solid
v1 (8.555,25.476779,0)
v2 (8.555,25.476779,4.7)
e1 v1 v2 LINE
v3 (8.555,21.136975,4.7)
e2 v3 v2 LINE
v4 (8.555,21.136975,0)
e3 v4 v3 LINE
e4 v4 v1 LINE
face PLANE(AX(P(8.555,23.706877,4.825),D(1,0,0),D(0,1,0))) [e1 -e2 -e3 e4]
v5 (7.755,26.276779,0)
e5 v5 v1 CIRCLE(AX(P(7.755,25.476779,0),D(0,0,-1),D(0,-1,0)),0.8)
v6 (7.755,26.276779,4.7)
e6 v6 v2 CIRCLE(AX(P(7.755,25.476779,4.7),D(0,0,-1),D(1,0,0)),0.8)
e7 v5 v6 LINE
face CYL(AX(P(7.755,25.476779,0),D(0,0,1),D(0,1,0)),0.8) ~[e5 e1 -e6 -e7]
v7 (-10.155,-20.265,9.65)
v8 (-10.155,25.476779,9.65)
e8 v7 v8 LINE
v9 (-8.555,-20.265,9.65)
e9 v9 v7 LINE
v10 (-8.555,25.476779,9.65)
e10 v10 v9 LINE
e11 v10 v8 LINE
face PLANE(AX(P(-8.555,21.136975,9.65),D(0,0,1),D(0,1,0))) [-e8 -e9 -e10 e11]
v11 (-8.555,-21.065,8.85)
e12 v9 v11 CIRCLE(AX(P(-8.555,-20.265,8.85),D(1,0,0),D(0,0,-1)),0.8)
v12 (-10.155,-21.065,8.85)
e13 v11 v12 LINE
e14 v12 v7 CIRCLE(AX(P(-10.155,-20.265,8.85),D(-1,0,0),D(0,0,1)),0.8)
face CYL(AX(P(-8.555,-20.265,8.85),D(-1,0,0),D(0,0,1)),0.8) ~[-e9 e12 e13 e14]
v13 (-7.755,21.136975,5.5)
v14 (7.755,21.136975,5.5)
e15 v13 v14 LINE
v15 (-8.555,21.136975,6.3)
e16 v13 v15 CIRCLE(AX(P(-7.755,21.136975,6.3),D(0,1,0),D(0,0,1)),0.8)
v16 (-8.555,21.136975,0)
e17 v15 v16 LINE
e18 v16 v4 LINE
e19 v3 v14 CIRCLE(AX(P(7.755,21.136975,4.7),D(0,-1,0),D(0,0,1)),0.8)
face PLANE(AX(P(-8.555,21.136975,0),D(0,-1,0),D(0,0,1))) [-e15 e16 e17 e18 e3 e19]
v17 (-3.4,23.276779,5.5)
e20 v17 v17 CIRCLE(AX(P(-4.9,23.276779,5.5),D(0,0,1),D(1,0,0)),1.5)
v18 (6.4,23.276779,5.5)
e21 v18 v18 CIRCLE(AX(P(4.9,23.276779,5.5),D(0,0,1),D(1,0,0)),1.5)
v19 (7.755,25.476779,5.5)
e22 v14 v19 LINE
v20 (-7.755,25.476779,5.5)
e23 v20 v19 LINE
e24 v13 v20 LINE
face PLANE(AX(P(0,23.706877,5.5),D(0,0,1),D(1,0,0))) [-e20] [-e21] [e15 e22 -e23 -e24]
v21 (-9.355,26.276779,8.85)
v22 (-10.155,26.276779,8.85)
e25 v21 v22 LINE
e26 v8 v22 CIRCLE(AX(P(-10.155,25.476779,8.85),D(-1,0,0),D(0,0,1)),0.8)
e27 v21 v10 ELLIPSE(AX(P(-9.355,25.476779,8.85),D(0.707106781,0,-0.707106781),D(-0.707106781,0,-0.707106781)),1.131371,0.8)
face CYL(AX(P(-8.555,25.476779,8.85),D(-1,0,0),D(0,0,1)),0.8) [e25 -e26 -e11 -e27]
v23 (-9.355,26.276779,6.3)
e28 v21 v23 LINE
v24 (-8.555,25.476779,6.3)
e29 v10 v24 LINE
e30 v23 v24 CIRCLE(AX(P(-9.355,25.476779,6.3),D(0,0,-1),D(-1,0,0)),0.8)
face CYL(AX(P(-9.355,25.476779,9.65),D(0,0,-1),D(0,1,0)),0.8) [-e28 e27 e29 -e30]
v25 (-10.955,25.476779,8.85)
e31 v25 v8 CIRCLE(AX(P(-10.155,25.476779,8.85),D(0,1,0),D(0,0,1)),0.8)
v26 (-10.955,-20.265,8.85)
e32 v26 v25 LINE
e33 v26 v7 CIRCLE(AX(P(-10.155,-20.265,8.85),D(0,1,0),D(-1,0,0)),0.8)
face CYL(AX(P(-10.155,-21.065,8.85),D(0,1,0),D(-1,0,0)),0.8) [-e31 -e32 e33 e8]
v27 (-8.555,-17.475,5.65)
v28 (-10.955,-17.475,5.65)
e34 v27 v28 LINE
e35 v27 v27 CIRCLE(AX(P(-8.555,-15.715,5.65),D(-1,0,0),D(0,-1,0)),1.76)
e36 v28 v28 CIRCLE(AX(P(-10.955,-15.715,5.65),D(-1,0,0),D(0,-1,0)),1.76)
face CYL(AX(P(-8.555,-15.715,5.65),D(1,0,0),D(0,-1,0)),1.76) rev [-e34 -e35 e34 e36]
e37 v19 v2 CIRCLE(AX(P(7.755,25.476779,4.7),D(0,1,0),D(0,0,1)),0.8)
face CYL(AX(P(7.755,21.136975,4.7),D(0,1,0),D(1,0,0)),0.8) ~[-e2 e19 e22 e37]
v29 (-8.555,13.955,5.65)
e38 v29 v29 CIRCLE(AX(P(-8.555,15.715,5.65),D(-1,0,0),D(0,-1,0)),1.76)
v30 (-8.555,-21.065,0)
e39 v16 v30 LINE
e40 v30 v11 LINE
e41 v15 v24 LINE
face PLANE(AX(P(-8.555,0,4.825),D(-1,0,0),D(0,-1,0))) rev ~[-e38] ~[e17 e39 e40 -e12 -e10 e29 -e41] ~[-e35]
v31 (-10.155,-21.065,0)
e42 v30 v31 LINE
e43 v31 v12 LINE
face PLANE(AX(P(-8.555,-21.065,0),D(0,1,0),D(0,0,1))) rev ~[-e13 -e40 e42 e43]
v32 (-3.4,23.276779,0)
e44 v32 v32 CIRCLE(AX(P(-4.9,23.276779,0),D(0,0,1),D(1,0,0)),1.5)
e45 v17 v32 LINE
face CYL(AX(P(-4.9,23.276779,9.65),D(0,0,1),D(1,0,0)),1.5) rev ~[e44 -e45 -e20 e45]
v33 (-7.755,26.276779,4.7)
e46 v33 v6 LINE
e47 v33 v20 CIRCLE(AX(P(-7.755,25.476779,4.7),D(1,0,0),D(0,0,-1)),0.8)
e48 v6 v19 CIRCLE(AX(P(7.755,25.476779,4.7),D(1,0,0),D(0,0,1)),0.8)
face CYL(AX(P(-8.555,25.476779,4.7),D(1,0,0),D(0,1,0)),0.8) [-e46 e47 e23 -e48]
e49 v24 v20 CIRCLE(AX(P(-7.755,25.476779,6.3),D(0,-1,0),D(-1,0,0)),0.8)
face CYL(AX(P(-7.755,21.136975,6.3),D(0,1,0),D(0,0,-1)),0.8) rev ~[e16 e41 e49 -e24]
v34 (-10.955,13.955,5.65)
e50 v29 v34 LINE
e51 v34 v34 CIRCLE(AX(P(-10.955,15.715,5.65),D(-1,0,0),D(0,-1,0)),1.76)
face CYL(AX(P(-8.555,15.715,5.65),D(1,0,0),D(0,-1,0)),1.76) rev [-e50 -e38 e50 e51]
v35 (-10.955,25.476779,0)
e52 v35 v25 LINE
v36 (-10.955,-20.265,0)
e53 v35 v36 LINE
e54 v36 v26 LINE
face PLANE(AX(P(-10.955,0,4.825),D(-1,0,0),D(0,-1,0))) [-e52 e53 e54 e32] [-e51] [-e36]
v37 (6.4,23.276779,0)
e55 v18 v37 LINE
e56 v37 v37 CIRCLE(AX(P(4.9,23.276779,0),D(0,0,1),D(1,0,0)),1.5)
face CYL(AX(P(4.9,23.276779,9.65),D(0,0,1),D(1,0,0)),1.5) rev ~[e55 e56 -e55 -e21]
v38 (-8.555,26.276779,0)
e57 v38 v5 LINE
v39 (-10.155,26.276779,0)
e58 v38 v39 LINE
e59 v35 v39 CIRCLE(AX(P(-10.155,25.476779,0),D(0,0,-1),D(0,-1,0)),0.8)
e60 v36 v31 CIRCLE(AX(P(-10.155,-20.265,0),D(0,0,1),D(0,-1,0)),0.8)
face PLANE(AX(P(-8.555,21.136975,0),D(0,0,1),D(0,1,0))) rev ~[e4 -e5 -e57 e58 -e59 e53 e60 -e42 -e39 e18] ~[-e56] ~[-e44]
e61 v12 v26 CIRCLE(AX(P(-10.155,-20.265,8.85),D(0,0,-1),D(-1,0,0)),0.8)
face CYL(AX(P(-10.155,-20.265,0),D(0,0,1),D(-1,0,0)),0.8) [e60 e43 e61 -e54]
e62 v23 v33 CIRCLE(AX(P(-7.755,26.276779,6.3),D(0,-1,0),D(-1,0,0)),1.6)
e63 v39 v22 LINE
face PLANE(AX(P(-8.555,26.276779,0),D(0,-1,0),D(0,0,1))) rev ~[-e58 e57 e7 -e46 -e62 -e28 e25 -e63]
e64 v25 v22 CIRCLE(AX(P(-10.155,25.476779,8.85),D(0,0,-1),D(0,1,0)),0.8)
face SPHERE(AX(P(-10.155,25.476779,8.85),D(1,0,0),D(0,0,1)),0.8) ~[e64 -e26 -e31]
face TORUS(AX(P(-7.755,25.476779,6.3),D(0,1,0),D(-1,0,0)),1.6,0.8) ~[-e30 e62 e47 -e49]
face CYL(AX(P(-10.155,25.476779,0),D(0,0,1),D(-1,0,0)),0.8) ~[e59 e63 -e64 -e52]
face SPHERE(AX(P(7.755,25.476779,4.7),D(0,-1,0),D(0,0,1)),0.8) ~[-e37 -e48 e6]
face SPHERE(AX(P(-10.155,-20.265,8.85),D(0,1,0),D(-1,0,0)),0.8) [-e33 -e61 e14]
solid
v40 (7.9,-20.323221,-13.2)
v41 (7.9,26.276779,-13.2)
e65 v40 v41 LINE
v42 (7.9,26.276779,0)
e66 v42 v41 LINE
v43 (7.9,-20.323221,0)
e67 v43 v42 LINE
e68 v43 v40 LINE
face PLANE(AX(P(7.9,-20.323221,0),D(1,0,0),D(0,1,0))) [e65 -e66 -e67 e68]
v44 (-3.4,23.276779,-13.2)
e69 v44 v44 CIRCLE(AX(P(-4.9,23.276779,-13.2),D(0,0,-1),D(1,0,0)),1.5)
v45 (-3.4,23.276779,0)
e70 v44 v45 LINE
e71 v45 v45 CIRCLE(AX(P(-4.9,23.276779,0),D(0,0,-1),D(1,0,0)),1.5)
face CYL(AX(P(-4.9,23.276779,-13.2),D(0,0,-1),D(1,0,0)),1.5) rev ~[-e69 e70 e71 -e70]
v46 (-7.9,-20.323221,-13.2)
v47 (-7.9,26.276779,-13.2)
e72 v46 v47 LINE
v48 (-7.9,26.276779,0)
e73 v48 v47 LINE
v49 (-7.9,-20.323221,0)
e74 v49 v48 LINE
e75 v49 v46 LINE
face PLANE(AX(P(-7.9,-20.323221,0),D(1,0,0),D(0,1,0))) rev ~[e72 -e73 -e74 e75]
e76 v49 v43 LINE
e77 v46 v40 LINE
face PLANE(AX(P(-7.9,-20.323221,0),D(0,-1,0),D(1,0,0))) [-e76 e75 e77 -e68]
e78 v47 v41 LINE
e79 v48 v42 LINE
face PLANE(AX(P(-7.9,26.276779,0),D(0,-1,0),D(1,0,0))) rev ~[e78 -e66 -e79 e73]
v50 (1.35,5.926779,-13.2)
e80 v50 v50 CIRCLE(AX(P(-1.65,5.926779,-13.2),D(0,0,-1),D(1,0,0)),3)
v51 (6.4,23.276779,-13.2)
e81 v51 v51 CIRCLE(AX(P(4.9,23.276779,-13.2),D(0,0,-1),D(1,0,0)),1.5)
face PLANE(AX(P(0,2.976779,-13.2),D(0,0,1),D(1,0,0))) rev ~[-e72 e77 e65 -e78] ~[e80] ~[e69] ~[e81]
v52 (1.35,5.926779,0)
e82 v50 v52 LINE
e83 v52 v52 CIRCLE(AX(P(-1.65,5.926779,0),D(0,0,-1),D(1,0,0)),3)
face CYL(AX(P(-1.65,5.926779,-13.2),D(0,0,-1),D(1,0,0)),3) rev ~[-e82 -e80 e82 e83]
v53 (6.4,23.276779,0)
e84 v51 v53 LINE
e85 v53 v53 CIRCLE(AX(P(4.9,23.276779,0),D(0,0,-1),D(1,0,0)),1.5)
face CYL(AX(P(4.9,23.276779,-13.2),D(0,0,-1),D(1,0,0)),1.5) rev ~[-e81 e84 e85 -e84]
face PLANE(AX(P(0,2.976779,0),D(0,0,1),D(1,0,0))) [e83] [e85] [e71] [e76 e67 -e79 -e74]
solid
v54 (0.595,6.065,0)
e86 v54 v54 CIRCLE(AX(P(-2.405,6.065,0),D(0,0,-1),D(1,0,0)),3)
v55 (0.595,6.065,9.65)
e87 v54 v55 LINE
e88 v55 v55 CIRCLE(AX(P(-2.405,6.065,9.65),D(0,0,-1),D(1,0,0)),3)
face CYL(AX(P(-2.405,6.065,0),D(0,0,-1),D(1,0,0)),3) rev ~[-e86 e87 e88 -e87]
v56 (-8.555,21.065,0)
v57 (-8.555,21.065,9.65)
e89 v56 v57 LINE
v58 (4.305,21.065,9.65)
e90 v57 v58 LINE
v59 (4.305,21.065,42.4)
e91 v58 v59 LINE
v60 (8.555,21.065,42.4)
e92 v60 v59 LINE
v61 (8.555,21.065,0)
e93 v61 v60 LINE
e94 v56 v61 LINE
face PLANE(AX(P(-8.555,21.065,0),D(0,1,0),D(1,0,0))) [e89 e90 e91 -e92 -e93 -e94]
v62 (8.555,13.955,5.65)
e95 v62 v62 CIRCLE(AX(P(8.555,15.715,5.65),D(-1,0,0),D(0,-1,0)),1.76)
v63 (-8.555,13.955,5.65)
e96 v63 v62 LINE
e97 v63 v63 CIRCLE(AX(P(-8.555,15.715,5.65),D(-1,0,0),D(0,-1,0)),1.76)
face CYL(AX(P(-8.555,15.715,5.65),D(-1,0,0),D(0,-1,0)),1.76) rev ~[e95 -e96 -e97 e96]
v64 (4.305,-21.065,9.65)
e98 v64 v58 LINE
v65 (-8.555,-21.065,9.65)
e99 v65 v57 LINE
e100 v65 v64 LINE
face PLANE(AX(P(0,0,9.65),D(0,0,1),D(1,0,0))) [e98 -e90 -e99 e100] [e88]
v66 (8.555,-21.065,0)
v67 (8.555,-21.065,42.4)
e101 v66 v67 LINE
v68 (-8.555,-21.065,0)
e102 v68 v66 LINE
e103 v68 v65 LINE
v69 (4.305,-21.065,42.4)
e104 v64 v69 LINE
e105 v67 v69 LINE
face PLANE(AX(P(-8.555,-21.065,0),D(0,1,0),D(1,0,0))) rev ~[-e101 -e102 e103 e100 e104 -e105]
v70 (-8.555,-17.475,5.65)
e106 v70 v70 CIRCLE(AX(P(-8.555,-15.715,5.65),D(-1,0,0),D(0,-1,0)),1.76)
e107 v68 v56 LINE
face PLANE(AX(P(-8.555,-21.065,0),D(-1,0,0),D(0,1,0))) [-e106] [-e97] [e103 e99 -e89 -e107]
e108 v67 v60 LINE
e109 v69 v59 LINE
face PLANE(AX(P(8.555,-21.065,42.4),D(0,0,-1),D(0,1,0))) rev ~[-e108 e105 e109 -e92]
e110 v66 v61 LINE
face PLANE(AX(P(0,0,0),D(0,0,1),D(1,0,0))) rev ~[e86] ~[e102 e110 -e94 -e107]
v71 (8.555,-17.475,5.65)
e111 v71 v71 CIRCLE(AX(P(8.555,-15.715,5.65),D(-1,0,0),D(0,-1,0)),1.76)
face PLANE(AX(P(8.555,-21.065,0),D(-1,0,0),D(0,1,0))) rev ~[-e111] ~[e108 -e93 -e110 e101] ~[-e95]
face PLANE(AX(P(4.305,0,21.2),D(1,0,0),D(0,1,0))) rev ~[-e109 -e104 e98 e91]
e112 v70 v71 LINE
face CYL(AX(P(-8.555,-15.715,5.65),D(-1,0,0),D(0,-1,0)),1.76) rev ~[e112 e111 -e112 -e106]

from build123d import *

# Parameters (mm, degrees)
F0_W      = 17.11
F0_H      = 42.13
F1_DEPTH  = 9.65
F3_W      = 42.13
F3_H      = 42.4
F4_DEPTH  = 4.25
F2_R      = 1.76
F5_DEPTH  = 17.111
F6_R      = 3
F7_DEPTH  = 25
F8_W      = 15.8
F8_H      = 46.6
F9_DEPTH  = 13.2
F10_R     = 3
F10_R_2   = 1.5
F11_DEPTH = 25
F12_W     = 42.13
F12_H     = 9.65
F12_R     = 1.76
F12_W_2   = 5.2117788947
F12_W_3   = 47.3417788947
F13_DEPTH = 2.4
F14_W     = 5.1398039788
F14_H     = 9.65
F15_DEPTH = 17.11
F16_R     = 1.5
F17_DEPTH = 25
F18_W     = 17.11
F18_H     = 5.1398039788
F19_DEPTH = 4.15
F20_R     = 0.8


with BuildPart() as f1:
    # F0 (on Top) → F1 (new body)
    with BuildSketch(Plane.XY):
        Rectangle(F0_W, F0_H)
    extrude(amount=F1_DEPTH)

    # F3 (on face) → F4 (join)
    with BuildSketch(Plane.YZ.offset(8.555)):
        with Locations((0, 21.2)):
            Rectangle(F3_W, F3_H)
    extrude(amount=-F4_DEPTH)

    # F2 (on face) → F5 (cut, through all)
    with BuildSketch(Plane(origin=(-8.555, 0, 0), x_dir=(0, -1, 0), z_dir=(-1, 0, 0))):
        with Locations((-15.715, 5.65)):
            Circle(F2_R)
        with Locations((15.715, 5.65)):
            Circle(F2_R)
    extrude(amount=-F5_DEPTH, mode=Mode.SUBTRACT)

    # F6 (on face) → F7 (cut)
    with BuildSketch(Plane(origin=(0, 0, 0), x_dir=(1, 0, 0), z_dir=(0, 0, -1))):
        with Locations((-2.405, -6.065)):
            Circle(F6_R)
    extrude(amount=-F7_DEPTH, mode=Mode.SUBTRACT)


with BuildPart() as f9:
    # F8 (on Top) → F9 (new body)
    with BuildSketch(Plane.XY):
        with Locations((0, 2.9767788947)):
            Rectangle(F8_W, F8_H)
    extrude(amount=-F9_DEPTH)

    # F10 (on face) → F11 (cut)
    with BuildSketch(Plane(origin=(0, 0, -13.2), x_dir=(1, 0, 0), z_dir=(0, 0, -1))):
        with Locations((-1.65, -5.9267788947)):
            Circle(F10_R)
        with Locations((-4.9, -23.2767788947)):
            Circle(F10_R_2)
        with Locations((4.9, -23.2767788947)):
            Circle(F10_R_2)
    extrude(amount=-F11_DEPTH, mode=Mode.SUBTRACT)


with BuildPart() as f13:
    # F12 (on face) → F13 (new body)
    with BuildSketch(Plane(origin=(-8.555, 0, 0), x_dir=(0, -1, 0), z_dir=(-1, 0, 0))):
        with Locations((0, 4.825)):
            Rectangle(F12_W, F12_H)
        with Locations((-15.715, 5.65)):
            Circle(F12_R, mode=Mode.SUBTRACT)
        with Locations((15.715, 5.65)):
            Circle(F12_R, mode=Mode.SUBTRACT)
        with Locations((-23.6708894473, 4.825)):
            Rectangle(F12_W_2, F12_H)
        with Locations((-2.6058894473, 4.825)):
            Rectangle(F12_W_3, F12_H)
        with Locations((-15.715, 5.65)):
            Circle(F12_R, mode=Mode.SUBTRACT)
        with Locations((15.715, 5.65)):
            Circle(F12_R, mode=Mode.SUBTRACT)
    extrude(amount=F13_DEPTH)

    # F14 (on face) → F15 (join, through all)
    with BuildSketch(Plane.YZ.offset(-8.555)):
        with Locations((23.7068769053, 4.825)):
            Rectangle(F14_W, F14_H)
    extrude(amount=F15_DEPTH)

    # F16 (on face) → F17 (cut)
    with BuildSketch(Plane.XY.offset(9.65)):
        with Locations((-4.9, 23.2767788947)):
            Circle(F16_R)
        with Locations((4.9, 23.2767788947)):
            Circle(F16_R)
    extrude(amount=-F17_DEPTH, mode=Mode.SUBTRACT)

    # F18 (on face) → F19 (cut)
    with BuildSketch(Plane.XY.offset(9.65)):
        with Locations((0, 23.7068769053)):
            Rectangle(F18_W, F18_H)
    extrude(amount=-F19_DEPTH, mode=Mode.SUBTRACT)

    # F20
    f20_edges = [f13.edges().sort_by_distance(p)[0] for p in [
        (8.555, 23.706877, 5.5),
        (0, 26.276779, 5.5),
        (-8.555, 23.706877, 5.5),
        (-8.555, 26.276779, 7.575),
        (-9.755, 26.276779, 9.65),
        (-10.955, 2.605889, 9.65),
        (-10.955, -21.065, 4.825),
        (-9.755, -21.065, 9.65),
        (8.555, 26.276779, 2.75),
        (-10.955, 26.276779, 4.825),
    ]]
    fillet(f20_edges, radius=F20_R)


solid = Compound([f1.part, f9.part, f13.part])
